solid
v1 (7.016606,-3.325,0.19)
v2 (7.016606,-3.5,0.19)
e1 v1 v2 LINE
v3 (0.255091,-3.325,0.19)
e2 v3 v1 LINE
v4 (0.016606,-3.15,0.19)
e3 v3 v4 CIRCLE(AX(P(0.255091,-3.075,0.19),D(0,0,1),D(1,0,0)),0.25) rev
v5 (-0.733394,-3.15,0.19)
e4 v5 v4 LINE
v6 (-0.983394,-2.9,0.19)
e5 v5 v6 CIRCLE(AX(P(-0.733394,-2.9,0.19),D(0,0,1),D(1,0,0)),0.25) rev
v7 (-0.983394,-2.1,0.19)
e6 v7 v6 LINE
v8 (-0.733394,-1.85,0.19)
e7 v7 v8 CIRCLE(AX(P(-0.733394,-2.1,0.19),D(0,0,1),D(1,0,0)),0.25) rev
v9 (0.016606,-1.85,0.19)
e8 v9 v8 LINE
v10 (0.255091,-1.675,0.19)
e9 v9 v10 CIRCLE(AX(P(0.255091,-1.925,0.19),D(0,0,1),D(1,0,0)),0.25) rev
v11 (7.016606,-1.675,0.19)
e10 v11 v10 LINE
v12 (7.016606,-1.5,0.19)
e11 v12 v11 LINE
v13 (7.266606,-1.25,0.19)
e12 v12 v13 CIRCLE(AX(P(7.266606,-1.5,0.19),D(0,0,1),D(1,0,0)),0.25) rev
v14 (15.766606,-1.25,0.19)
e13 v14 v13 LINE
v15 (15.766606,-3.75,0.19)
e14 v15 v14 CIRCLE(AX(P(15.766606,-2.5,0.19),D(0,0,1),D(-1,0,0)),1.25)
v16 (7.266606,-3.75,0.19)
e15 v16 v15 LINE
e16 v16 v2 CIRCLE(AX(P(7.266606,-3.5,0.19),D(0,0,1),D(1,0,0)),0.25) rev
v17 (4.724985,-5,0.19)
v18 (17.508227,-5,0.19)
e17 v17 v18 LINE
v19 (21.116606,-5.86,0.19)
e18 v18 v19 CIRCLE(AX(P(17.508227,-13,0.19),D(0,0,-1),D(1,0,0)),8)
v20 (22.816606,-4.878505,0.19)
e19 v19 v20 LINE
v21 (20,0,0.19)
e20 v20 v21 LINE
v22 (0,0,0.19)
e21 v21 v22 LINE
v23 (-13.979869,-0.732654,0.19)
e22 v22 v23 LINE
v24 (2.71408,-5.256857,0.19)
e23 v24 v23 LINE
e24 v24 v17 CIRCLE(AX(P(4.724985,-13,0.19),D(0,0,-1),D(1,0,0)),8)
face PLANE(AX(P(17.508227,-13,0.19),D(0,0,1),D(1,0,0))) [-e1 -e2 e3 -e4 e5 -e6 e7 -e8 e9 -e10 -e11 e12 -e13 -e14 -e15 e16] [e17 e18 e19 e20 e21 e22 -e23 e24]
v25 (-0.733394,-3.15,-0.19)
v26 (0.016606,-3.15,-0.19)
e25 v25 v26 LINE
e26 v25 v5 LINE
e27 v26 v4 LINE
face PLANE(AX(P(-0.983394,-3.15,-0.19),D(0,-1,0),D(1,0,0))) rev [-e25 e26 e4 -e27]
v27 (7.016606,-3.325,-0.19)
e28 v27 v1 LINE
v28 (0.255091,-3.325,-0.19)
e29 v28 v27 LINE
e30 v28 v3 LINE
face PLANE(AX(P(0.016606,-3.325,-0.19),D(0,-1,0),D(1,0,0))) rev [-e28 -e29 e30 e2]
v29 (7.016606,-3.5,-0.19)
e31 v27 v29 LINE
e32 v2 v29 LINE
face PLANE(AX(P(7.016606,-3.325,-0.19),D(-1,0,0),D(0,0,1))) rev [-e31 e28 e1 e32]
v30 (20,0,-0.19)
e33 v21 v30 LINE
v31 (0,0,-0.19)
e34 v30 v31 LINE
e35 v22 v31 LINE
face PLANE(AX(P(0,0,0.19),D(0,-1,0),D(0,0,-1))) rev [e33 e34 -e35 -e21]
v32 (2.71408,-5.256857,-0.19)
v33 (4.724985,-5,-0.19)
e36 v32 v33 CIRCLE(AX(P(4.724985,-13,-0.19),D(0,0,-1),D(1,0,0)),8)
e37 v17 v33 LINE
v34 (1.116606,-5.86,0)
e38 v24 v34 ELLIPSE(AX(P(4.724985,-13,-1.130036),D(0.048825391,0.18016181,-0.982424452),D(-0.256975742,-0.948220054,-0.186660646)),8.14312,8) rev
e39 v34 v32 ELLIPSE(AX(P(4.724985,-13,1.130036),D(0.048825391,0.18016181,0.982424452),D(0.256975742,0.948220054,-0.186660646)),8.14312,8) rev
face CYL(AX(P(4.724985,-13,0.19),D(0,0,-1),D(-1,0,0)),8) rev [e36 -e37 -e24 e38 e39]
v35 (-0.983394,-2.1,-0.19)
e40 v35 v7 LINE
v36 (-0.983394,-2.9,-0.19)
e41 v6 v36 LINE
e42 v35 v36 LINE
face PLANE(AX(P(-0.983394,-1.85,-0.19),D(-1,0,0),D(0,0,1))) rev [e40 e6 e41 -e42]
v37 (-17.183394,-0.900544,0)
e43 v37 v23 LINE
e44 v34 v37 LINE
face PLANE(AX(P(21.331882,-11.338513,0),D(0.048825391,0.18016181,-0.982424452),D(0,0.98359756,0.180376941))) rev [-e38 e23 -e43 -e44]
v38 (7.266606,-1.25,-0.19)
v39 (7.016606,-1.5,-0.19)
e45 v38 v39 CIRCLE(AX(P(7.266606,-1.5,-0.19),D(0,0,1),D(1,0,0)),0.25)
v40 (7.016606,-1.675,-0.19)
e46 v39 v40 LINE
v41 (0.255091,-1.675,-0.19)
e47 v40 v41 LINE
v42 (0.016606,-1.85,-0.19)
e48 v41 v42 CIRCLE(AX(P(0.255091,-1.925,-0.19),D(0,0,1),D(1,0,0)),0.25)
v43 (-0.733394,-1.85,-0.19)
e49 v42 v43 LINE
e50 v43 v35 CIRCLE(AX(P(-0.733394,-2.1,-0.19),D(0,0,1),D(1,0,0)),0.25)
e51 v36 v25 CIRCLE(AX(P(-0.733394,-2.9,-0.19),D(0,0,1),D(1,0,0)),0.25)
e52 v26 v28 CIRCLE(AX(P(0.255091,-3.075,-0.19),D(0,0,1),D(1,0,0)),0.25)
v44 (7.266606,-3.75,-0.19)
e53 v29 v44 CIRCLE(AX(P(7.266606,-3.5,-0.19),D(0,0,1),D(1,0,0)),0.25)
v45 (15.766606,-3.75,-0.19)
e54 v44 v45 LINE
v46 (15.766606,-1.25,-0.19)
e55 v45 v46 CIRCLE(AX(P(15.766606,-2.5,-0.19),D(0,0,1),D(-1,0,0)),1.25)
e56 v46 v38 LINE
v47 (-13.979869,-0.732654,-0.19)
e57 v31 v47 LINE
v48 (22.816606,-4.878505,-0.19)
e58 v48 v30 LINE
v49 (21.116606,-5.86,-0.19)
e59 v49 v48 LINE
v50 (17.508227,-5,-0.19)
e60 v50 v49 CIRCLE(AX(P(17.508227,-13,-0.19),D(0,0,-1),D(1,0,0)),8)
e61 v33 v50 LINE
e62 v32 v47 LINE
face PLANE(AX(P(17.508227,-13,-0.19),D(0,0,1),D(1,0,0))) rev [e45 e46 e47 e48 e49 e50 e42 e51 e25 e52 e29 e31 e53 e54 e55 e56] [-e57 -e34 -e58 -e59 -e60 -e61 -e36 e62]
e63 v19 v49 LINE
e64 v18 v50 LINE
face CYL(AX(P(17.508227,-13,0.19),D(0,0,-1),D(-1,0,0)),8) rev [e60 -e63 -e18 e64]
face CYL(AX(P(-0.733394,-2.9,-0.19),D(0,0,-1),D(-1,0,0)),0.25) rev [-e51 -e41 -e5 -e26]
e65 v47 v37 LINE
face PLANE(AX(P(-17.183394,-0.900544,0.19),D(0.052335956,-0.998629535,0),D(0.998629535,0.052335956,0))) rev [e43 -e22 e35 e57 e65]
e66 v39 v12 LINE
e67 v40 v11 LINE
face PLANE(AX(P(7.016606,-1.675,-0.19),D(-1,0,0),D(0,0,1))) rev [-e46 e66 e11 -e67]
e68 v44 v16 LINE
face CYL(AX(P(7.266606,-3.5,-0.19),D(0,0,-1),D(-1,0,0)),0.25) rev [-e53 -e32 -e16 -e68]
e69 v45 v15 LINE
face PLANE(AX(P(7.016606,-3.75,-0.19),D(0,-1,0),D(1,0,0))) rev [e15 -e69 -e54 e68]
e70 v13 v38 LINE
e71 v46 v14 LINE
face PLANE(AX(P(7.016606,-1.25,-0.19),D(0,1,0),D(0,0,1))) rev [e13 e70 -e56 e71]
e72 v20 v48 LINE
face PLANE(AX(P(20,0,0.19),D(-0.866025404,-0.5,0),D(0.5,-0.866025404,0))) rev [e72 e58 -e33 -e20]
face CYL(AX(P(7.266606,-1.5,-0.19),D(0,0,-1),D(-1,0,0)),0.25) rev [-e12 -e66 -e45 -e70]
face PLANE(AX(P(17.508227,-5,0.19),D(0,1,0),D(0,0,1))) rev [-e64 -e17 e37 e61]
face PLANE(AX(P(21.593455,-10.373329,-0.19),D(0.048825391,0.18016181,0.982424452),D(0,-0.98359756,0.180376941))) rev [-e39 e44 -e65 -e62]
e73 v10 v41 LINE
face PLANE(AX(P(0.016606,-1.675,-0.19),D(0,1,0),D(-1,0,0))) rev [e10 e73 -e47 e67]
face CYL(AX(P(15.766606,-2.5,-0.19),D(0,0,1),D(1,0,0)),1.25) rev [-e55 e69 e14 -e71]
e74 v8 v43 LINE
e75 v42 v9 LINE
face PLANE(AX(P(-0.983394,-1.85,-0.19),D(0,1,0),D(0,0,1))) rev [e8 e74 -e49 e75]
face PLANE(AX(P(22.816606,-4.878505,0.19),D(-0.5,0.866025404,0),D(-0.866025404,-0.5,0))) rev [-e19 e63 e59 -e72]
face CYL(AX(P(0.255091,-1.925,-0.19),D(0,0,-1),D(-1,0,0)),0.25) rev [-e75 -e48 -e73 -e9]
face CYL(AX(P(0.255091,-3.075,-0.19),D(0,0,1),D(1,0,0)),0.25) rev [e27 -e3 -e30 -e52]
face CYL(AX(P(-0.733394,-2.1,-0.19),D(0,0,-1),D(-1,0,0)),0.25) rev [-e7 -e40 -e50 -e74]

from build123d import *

# Parameters (mm, degrees)
BOSS_EXTRU_1_DEPTH           = 0.19
ENL_V_MAT_EXTRU_1_DEPTH      = 24.560167769
CONG_1_R                     = 0.25
ENL_V_MAT_EXTRU_2_DEPTH      = 21.94767488
ENL_V_MAT_EXTRU_2_DEPTH_BACK = 21.94767488


with BuildPart() as part:
    # Esquisse1 → Boss.-Extru.1 (new, symmetric)
    with BuildSketch(Plane.XY):
        with BuildLine():
            Line((-17.183394089, -0.900543525), (0, 0))
            Line((0, 0), (20, 0))
            Line((20, 0), (22.816605911, -4.878504542))
            Line((22.816605911, -4.878504542), (21.116605911, -5.86))
            ThreePointArc((21.116605911, -5.86), (19.362950472, -5.217969417), (17.508226773, -5))
            Line((17.508226773, -5), (4.724985048, -5))
            ThreePointArc((4.724985048, -5), (2.870261349, -5.217969417), (1.116605911, -5.86))
            Line((1.116605911, -5.86), (-17.183394089, -0.900543525))
        make_face()
    extrude(amount=BOSS_EXTRU_1_DEPTH, both=True)

    # Esquisse2 → Enlèv. mat.-Extru.1 (cut, through all)
    with BuildSketch(Plane.XY.offset(0.19)):
        with BuildLine():
            Line((-0.983394089, -1.85), (0.016605911, -1.85))
            Line((0.016605911, -1.85), (0.016605911, -1.675))
            Line((0.016605911, -1.675), (7.016605911, -1.675))
            Line((7.016605911, -1.675), (7.016605911, -1.25))
            Line((7.016605911, -1.25), (15.766605911, -1.25))
            ThreePointArc((15.766605911, -1.25), (17.016605911, -2.5), (15.766605911, -3.75))
            Line((15.766605911, -3.75), (7.016605911, -3.75))
            Line((7.016605911, -3.75), (7.016605911, -3.325))
            Line((7.016605911, -3.325), (0.016605911, -3.325))
            Line((0.016605911, -3.325), (0.016605911, -3.15))
            Line((0.016605911, -3.15), (-0.983394089, -3.15))
            Line((-0.983394089, -3.15), (-0.983394089, -1.85))
        make_face()
    extrude(amount=-ENL_V_MAT_EXTRU_1_DEPTH, mode=Mode.SUBTRACT)

    # Congé1
    # the kernel refuses this fillet: 0.25 mm, written as the material it adds along each edge
    with BuildSketch(Plane(origin=(7.016605911, -3.75, 0.19), x_dir=(0, 1, 0), z_dir=(0, 0, -1))) as cong_1_piece_1:
        with BuildLine():
            CenterArc((CONG_1_R, CONG_1_R), CONG_1_R, 180, 90)
            Line((0, CONG_1_R), (-CONG_1_R * 0.02, CONG_1_R))
            Line((-CONG_1_R * 0.02, CONG_1_R), (-CONG_1_R * 0.02, -CONG_1_R * 0.02))
            Line((-CONG_1_R * 0.02, -CONG_1_R * 0.02), (CONG_1_R, -CONG_1_R * 0.02))
            Line((CONG_1_R, -CONG_1_R * 0.02), (CONG_1_R, 0))
        make_face()
    extrude(amount=0.38)
    with BuildSketch(Plane(origin=(7.016605911, -1.25, 0.19), x_dir=(0, -1, 0), z_dir=(0, 0, -1)), Plane(origin=(-0.983394089, -3.15, 0.19), x_dir=(1, 0, 0), z_dir=(0, 0, -1)), Plane(origin=(-0.983394089, -1.85, 0.19), x_dir=(0, -1, 0), z_dir=(0, 0, -1))) as cong_1_piece_2:
        with BuildLine():
            CenterArc((CONG_1_R, -CONG_1_R), CONG_1_R, 90, 90)
            Line((0, -CONG_1_R), (-CONG_1_R * 0.02, -CONG_1_R))
            Line((-CONG_1_R * 0.02, -CONG_1_R), (-CONG_1_R * 0.02, CONG_1_R * 0.02))
            Line((-CONG_1_R * 0.02, CONG_1_R * 0.02), (CONG_1_R, CONG_1_R * 0.02))
            Line((CONG_1_R, CONG_1_R * 0.02), (CONG_1_R, 0))
        make_face()
    extrude(amount=0.38)
    with BuildSketch(Plane(origin=(0.016605911, -3.325, 0.19), x_dir=(1, 0, 0), z_dir=(0, 0, -1))) as cong_1_piece_3:
        with BuildLine():
            CenterArc((0.2384848, -0.25), CONG_1_R, 90, 72.542396876)
            Line((0, -0.175), (-0.004769696, -0.1735))
            ThreePointArc((-0.004769696, -0.1735), (-0.005, -0.0875), (-0.005, 0))
            Line((-0.005, 0), (0, 0.005))
            Line((0, 0.005), (0.2384848, 0.005))
            Line((0.2384848, 0.005), (0.2384848, 0))
        make_face()
    extrude(amount=0.38)
    with BuildSketch(Plane(origin=(0.016605911, -1.675, 0.19), x_dir=(0, -1, 0), z_dir=(0, 0, -1))) as cong_1_piece_4:
        with BuildLine():
            CenterArc((0.25, -0.2384848), CONG_1_R, 107.457603124, 72.542396876)
            Line((0, -0.2384848), (-0.005, -0.2384848))
            Line((-0.005, -0.2384848), (-0.005, 0))
            Line((-0.005, 0), (0, 0.005))
            ThreePointArc((0, 0.005), (0.0875, 0.005), (0.1735, 0.004769696))
            Line((0.1735, 0.004769696), (0.175, 0))
        make_face()
    extrude(amount=0.38)

    # Esquisse3 → Enlèv. mat.-Extru.2 (cut, two sides: drawn at the far end of the back side and taken through both)
    with BuildSketch(Plane(origin=(2.519658127, -0.682848897, 0), x_dir=(0, 0, 1), z_dir=(-0.9651836866427717, 0.26157303194073345, 0)).offset(-ENL_V_MAT_EXTRU_2_DEPTH_BACK)):
        Polygon((0, -5.36390241), (0.19, -4.36390241), (0.19, -5.53890241), (-0.19, -5.53890241), (-0.19, -4.36390241), align=None)
    extrude(amount=ENL_V_MAT_EXTRU_2_DEPTH + ENL_V_MAT_EXTRU_2_DEPTH_BACK, mode=Mode.SUBTRACT)


solid = part.part
